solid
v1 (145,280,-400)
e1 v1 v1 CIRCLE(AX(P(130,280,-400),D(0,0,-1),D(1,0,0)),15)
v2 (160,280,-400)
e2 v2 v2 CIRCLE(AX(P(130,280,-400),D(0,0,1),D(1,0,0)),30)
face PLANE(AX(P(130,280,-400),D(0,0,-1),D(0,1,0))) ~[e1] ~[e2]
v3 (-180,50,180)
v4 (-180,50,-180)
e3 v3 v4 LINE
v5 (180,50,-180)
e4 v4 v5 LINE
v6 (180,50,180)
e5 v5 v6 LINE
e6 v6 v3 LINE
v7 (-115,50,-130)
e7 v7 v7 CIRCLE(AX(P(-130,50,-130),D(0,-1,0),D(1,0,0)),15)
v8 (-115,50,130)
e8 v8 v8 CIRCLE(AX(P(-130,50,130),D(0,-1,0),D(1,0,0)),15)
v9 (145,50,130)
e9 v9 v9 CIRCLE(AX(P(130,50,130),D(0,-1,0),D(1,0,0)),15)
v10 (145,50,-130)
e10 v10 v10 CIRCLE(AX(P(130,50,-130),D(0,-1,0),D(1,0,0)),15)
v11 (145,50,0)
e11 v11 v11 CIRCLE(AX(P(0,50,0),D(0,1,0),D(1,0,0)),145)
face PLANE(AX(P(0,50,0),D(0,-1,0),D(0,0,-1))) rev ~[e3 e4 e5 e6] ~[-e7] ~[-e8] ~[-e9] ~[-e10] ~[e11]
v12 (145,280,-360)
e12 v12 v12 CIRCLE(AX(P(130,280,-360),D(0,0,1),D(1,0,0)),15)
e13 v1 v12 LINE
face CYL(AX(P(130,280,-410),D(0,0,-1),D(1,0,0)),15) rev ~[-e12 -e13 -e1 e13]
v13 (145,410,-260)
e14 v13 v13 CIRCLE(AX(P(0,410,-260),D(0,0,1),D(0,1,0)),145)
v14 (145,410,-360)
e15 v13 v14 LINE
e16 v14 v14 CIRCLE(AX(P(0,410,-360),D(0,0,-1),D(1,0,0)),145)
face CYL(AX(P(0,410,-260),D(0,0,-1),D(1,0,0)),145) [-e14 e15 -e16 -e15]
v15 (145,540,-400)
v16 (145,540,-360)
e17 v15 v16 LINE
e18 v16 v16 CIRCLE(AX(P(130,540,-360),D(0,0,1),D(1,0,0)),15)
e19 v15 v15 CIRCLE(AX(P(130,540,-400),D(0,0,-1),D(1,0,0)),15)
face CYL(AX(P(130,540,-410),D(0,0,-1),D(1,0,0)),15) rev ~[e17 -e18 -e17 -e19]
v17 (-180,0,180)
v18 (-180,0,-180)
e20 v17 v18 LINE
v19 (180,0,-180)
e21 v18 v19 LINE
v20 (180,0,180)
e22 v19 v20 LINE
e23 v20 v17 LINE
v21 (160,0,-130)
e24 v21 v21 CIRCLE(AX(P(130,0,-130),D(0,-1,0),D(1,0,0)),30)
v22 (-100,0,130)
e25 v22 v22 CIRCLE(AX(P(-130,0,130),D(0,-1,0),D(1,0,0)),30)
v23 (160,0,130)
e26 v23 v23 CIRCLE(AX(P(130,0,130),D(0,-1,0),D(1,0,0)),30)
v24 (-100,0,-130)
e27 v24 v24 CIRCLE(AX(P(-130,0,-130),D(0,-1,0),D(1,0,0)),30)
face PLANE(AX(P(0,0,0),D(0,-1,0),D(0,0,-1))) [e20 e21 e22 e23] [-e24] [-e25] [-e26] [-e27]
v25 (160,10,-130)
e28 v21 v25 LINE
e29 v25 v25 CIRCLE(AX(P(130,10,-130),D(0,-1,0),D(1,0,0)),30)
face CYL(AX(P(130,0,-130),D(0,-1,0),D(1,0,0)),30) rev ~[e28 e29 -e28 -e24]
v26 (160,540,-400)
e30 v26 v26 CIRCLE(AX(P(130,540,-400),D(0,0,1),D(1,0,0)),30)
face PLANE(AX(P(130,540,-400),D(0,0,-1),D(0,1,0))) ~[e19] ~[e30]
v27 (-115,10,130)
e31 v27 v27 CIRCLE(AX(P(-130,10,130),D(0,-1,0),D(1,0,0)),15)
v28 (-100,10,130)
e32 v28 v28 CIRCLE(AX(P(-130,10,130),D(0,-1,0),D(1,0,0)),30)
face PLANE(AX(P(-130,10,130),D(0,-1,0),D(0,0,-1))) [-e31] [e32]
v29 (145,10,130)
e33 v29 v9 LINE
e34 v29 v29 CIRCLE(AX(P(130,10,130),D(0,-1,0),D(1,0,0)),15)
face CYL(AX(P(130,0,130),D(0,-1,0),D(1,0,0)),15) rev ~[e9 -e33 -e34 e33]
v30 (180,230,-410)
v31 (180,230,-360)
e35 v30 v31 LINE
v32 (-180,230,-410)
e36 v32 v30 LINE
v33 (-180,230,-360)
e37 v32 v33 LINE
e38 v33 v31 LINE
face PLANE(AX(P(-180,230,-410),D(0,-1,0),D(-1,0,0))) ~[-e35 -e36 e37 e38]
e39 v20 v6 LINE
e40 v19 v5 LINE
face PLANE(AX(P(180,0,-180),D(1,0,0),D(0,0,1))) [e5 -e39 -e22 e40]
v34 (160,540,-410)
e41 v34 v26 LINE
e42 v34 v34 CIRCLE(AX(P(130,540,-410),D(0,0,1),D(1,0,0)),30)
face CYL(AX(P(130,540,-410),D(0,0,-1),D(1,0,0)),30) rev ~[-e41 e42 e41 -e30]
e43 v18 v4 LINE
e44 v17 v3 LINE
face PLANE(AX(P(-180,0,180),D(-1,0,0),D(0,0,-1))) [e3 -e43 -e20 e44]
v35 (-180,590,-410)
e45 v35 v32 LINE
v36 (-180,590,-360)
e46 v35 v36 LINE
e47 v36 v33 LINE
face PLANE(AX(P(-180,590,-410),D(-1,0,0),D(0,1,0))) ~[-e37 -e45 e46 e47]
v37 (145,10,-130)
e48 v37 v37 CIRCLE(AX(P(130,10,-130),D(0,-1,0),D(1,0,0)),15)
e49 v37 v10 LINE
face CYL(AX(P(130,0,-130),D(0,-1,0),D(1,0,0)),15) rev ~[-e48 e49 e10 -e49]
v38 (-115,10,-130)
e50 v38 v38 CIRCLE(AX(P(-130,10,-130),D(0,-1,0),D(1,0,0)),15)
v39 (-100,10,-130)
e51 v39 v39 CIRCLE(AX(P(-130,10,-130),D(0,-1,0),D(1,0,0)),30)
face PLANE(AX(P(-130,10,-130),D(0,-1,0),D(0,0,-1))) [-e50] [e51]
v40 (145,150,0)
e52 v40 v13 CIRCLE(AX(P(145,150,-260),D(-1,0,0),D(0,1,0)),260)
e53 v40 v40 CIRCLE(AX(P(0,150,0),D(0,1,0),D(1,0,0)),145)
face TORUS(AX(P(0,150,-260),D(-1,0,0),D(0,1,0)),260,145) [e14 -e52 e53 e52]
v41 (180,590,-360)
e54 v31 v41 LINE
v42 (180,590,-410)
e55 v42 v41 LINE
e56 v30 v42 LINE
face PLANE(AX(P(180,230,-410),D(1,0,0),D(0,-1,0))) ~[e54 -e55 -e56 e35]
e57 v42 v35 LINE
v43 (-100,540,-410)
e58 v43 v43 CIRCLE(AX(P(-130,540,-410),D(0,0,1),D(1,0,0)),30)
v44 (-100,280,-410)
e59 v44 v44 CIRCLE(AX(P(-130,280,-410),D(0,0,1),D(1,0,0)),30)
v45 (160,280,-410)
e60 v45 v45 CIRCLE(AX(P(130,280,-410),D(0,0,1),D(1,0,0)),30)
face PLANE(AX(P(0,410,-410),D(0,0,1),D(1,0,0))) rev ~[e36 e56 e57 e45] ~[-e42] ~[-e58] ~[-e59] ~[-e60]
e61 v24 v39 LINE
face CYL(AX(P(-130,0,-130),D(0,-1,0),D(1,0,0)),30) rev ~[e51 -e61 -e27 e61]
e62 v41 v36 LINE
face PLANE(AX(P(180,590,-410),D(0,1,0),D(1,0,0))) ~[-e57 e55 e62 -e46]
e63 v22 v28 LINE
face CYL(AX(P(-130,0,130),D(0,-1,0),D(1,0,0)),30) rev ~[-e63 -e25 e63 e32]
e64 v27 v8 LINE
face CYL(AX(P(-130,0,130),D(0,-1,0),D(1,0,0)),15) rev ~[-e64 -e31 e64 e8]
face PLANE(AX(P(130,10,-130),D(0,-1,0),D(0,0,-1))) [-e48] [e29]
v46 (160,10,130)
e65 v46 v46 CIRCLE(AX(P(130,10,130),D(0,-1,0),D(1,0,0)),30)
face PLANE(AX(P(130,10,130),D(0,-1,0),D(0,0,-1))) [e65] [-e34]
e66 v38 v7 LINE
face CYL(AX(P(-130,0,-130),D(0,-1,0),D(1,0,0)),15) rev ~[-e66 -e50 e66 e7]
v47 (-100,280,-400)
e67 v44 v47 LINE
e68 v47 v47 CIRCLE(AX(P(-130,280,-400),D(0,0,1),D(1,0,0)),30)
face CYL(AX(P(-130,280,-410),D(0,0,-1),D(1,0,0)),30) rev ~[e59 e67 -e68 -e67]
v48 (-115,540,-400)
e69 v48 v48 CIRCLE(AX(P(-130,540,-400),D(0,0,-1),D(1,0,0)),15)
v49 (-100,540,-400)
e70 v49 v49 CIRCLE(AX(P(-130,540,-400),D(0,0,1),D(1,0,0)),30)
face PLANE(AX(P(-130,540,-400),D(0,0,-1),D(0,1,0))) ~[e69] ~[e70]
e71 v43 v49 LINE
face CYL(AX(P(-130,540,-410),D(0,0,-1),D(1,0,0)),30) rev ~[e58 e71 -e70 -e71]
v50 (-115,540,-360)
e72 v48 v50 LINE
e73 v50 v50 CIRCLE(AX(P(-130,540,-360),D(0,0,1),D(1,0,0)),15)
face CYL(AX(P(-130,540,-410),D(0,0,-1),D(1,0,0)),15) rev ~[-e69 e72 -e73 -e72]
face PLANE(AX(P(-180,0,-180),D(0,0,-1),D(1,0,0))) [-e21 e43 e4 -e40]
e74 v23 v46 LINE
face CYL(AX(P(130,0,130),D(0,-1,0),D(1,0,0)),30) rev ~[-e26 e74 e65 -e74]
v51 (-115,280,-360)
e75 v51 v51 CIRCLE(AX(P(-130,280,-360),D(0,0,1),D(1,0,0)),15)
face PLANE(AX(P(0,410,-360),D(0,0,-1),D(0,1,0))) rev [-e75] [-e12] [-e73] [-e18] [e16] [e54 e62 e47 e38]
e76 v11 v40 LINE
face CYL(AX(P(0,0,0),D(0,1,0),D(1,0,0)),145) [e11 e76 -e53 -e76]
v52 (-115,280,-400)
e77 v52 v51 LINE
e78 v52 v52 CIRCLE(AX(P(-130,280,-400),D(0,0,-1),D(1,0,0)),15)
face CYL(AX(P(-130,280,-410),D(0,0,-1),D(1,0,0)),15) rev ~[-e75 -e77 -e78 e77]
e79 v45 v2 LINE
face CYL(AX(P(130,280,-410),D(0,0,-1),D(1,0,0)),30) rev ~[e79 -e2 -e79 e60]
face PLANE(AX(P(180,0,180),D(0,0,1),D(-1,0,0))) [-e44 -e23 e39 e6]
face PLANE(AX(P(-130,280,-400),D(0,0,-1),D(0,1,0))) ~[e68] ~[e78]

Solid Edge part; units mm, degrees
sketch "Sketch1" plane through (0, 0, 0) normal (1, 0, 0) x (0, 1, 0)
  line L0 (410, -260) -> (410, -410)
  line L1 (0, 0) -> (150, 0)
  arc A0 (150, 0) -> (410, -260) centre (150, -260) cw
sketch "Sketch2" plane through (0, 0, 0) normal (0, -1, 0) x (1, 0, 0)
  circle A0 centre (0, 0) radius 145
sweep "SweptProtrusion_1" add profiles "Sketch2" path "Sketch1"
sketch "Sketch3" plane through (0, 0, 0) normal (1, 0, 0) x (0, 1, 0)
  line L0 (410, -260) -> (410, -410)
  line L1 (0, 0) -> (150, 0)
  arc A0 (150, 0) -> (410, -260) centre (150, -260) cw
sketch "Sketch4" plane through (0, 0, 0) normal (0, -1, 0) x (1, 0, 0)
  circle A0 centre (0, 0) radius 130
sweep "SweptCutout_1" cut profiles "Sketch4" path "Sketch3"
sketch "Sketch5" plane through (0, 0, 0) normal (0, -1, 0) x (1, 0, 0)
  line L0 (180, 180) -> (-180, 180)
  line L1 (-180, 180) -> (-180, -180)
  line L2 (-180, -180) -> (180, -180)
  line L3 (180, -180) -> (180, 180)
  circle A0 centre (0, 0) radius 130
extrude "ExtrudedProtrusion_2" add sketch "Sketch5" against normal blind 50
sketch "Sketch6" plane through (0, 0, 0) normal (0, -1, 0) x (1, 0, 0)
  circle A0 centre (130, 130) radius 30
  circle A1 centre (-130, 130) radius 30
  circle A2 centre (-130, -130) radius 30
  circle A3 centre (130, -130) radius 30
extrude "ExtrudedCutout_1" cut sketch "Sketch6" against normal blind 10
sketch "Sketch7" plane through (0, 0, 0) normal (0, -1, 0) x (1, 0, 0)
  circle A0 centre (130, 130) radius 15
  circle A1 centre (-130, 130) radius 15
  circle A2 centre (-130, -130) radius 15
  circle A3 centre (130, -130) radius 15
extrude "ExtrudedCutout_2" cut sketch "Sketch7" against normal blind 50
mirror "Mirror1" about plane through (0, 333.8478, -76.1522) normal (0, -0.7071068, 0.7071068) of "ExtrudedProtrusion_2", "ExtrudedCutout_1", "ExtrudedCutout_2", "SweptProtrusion_1"
